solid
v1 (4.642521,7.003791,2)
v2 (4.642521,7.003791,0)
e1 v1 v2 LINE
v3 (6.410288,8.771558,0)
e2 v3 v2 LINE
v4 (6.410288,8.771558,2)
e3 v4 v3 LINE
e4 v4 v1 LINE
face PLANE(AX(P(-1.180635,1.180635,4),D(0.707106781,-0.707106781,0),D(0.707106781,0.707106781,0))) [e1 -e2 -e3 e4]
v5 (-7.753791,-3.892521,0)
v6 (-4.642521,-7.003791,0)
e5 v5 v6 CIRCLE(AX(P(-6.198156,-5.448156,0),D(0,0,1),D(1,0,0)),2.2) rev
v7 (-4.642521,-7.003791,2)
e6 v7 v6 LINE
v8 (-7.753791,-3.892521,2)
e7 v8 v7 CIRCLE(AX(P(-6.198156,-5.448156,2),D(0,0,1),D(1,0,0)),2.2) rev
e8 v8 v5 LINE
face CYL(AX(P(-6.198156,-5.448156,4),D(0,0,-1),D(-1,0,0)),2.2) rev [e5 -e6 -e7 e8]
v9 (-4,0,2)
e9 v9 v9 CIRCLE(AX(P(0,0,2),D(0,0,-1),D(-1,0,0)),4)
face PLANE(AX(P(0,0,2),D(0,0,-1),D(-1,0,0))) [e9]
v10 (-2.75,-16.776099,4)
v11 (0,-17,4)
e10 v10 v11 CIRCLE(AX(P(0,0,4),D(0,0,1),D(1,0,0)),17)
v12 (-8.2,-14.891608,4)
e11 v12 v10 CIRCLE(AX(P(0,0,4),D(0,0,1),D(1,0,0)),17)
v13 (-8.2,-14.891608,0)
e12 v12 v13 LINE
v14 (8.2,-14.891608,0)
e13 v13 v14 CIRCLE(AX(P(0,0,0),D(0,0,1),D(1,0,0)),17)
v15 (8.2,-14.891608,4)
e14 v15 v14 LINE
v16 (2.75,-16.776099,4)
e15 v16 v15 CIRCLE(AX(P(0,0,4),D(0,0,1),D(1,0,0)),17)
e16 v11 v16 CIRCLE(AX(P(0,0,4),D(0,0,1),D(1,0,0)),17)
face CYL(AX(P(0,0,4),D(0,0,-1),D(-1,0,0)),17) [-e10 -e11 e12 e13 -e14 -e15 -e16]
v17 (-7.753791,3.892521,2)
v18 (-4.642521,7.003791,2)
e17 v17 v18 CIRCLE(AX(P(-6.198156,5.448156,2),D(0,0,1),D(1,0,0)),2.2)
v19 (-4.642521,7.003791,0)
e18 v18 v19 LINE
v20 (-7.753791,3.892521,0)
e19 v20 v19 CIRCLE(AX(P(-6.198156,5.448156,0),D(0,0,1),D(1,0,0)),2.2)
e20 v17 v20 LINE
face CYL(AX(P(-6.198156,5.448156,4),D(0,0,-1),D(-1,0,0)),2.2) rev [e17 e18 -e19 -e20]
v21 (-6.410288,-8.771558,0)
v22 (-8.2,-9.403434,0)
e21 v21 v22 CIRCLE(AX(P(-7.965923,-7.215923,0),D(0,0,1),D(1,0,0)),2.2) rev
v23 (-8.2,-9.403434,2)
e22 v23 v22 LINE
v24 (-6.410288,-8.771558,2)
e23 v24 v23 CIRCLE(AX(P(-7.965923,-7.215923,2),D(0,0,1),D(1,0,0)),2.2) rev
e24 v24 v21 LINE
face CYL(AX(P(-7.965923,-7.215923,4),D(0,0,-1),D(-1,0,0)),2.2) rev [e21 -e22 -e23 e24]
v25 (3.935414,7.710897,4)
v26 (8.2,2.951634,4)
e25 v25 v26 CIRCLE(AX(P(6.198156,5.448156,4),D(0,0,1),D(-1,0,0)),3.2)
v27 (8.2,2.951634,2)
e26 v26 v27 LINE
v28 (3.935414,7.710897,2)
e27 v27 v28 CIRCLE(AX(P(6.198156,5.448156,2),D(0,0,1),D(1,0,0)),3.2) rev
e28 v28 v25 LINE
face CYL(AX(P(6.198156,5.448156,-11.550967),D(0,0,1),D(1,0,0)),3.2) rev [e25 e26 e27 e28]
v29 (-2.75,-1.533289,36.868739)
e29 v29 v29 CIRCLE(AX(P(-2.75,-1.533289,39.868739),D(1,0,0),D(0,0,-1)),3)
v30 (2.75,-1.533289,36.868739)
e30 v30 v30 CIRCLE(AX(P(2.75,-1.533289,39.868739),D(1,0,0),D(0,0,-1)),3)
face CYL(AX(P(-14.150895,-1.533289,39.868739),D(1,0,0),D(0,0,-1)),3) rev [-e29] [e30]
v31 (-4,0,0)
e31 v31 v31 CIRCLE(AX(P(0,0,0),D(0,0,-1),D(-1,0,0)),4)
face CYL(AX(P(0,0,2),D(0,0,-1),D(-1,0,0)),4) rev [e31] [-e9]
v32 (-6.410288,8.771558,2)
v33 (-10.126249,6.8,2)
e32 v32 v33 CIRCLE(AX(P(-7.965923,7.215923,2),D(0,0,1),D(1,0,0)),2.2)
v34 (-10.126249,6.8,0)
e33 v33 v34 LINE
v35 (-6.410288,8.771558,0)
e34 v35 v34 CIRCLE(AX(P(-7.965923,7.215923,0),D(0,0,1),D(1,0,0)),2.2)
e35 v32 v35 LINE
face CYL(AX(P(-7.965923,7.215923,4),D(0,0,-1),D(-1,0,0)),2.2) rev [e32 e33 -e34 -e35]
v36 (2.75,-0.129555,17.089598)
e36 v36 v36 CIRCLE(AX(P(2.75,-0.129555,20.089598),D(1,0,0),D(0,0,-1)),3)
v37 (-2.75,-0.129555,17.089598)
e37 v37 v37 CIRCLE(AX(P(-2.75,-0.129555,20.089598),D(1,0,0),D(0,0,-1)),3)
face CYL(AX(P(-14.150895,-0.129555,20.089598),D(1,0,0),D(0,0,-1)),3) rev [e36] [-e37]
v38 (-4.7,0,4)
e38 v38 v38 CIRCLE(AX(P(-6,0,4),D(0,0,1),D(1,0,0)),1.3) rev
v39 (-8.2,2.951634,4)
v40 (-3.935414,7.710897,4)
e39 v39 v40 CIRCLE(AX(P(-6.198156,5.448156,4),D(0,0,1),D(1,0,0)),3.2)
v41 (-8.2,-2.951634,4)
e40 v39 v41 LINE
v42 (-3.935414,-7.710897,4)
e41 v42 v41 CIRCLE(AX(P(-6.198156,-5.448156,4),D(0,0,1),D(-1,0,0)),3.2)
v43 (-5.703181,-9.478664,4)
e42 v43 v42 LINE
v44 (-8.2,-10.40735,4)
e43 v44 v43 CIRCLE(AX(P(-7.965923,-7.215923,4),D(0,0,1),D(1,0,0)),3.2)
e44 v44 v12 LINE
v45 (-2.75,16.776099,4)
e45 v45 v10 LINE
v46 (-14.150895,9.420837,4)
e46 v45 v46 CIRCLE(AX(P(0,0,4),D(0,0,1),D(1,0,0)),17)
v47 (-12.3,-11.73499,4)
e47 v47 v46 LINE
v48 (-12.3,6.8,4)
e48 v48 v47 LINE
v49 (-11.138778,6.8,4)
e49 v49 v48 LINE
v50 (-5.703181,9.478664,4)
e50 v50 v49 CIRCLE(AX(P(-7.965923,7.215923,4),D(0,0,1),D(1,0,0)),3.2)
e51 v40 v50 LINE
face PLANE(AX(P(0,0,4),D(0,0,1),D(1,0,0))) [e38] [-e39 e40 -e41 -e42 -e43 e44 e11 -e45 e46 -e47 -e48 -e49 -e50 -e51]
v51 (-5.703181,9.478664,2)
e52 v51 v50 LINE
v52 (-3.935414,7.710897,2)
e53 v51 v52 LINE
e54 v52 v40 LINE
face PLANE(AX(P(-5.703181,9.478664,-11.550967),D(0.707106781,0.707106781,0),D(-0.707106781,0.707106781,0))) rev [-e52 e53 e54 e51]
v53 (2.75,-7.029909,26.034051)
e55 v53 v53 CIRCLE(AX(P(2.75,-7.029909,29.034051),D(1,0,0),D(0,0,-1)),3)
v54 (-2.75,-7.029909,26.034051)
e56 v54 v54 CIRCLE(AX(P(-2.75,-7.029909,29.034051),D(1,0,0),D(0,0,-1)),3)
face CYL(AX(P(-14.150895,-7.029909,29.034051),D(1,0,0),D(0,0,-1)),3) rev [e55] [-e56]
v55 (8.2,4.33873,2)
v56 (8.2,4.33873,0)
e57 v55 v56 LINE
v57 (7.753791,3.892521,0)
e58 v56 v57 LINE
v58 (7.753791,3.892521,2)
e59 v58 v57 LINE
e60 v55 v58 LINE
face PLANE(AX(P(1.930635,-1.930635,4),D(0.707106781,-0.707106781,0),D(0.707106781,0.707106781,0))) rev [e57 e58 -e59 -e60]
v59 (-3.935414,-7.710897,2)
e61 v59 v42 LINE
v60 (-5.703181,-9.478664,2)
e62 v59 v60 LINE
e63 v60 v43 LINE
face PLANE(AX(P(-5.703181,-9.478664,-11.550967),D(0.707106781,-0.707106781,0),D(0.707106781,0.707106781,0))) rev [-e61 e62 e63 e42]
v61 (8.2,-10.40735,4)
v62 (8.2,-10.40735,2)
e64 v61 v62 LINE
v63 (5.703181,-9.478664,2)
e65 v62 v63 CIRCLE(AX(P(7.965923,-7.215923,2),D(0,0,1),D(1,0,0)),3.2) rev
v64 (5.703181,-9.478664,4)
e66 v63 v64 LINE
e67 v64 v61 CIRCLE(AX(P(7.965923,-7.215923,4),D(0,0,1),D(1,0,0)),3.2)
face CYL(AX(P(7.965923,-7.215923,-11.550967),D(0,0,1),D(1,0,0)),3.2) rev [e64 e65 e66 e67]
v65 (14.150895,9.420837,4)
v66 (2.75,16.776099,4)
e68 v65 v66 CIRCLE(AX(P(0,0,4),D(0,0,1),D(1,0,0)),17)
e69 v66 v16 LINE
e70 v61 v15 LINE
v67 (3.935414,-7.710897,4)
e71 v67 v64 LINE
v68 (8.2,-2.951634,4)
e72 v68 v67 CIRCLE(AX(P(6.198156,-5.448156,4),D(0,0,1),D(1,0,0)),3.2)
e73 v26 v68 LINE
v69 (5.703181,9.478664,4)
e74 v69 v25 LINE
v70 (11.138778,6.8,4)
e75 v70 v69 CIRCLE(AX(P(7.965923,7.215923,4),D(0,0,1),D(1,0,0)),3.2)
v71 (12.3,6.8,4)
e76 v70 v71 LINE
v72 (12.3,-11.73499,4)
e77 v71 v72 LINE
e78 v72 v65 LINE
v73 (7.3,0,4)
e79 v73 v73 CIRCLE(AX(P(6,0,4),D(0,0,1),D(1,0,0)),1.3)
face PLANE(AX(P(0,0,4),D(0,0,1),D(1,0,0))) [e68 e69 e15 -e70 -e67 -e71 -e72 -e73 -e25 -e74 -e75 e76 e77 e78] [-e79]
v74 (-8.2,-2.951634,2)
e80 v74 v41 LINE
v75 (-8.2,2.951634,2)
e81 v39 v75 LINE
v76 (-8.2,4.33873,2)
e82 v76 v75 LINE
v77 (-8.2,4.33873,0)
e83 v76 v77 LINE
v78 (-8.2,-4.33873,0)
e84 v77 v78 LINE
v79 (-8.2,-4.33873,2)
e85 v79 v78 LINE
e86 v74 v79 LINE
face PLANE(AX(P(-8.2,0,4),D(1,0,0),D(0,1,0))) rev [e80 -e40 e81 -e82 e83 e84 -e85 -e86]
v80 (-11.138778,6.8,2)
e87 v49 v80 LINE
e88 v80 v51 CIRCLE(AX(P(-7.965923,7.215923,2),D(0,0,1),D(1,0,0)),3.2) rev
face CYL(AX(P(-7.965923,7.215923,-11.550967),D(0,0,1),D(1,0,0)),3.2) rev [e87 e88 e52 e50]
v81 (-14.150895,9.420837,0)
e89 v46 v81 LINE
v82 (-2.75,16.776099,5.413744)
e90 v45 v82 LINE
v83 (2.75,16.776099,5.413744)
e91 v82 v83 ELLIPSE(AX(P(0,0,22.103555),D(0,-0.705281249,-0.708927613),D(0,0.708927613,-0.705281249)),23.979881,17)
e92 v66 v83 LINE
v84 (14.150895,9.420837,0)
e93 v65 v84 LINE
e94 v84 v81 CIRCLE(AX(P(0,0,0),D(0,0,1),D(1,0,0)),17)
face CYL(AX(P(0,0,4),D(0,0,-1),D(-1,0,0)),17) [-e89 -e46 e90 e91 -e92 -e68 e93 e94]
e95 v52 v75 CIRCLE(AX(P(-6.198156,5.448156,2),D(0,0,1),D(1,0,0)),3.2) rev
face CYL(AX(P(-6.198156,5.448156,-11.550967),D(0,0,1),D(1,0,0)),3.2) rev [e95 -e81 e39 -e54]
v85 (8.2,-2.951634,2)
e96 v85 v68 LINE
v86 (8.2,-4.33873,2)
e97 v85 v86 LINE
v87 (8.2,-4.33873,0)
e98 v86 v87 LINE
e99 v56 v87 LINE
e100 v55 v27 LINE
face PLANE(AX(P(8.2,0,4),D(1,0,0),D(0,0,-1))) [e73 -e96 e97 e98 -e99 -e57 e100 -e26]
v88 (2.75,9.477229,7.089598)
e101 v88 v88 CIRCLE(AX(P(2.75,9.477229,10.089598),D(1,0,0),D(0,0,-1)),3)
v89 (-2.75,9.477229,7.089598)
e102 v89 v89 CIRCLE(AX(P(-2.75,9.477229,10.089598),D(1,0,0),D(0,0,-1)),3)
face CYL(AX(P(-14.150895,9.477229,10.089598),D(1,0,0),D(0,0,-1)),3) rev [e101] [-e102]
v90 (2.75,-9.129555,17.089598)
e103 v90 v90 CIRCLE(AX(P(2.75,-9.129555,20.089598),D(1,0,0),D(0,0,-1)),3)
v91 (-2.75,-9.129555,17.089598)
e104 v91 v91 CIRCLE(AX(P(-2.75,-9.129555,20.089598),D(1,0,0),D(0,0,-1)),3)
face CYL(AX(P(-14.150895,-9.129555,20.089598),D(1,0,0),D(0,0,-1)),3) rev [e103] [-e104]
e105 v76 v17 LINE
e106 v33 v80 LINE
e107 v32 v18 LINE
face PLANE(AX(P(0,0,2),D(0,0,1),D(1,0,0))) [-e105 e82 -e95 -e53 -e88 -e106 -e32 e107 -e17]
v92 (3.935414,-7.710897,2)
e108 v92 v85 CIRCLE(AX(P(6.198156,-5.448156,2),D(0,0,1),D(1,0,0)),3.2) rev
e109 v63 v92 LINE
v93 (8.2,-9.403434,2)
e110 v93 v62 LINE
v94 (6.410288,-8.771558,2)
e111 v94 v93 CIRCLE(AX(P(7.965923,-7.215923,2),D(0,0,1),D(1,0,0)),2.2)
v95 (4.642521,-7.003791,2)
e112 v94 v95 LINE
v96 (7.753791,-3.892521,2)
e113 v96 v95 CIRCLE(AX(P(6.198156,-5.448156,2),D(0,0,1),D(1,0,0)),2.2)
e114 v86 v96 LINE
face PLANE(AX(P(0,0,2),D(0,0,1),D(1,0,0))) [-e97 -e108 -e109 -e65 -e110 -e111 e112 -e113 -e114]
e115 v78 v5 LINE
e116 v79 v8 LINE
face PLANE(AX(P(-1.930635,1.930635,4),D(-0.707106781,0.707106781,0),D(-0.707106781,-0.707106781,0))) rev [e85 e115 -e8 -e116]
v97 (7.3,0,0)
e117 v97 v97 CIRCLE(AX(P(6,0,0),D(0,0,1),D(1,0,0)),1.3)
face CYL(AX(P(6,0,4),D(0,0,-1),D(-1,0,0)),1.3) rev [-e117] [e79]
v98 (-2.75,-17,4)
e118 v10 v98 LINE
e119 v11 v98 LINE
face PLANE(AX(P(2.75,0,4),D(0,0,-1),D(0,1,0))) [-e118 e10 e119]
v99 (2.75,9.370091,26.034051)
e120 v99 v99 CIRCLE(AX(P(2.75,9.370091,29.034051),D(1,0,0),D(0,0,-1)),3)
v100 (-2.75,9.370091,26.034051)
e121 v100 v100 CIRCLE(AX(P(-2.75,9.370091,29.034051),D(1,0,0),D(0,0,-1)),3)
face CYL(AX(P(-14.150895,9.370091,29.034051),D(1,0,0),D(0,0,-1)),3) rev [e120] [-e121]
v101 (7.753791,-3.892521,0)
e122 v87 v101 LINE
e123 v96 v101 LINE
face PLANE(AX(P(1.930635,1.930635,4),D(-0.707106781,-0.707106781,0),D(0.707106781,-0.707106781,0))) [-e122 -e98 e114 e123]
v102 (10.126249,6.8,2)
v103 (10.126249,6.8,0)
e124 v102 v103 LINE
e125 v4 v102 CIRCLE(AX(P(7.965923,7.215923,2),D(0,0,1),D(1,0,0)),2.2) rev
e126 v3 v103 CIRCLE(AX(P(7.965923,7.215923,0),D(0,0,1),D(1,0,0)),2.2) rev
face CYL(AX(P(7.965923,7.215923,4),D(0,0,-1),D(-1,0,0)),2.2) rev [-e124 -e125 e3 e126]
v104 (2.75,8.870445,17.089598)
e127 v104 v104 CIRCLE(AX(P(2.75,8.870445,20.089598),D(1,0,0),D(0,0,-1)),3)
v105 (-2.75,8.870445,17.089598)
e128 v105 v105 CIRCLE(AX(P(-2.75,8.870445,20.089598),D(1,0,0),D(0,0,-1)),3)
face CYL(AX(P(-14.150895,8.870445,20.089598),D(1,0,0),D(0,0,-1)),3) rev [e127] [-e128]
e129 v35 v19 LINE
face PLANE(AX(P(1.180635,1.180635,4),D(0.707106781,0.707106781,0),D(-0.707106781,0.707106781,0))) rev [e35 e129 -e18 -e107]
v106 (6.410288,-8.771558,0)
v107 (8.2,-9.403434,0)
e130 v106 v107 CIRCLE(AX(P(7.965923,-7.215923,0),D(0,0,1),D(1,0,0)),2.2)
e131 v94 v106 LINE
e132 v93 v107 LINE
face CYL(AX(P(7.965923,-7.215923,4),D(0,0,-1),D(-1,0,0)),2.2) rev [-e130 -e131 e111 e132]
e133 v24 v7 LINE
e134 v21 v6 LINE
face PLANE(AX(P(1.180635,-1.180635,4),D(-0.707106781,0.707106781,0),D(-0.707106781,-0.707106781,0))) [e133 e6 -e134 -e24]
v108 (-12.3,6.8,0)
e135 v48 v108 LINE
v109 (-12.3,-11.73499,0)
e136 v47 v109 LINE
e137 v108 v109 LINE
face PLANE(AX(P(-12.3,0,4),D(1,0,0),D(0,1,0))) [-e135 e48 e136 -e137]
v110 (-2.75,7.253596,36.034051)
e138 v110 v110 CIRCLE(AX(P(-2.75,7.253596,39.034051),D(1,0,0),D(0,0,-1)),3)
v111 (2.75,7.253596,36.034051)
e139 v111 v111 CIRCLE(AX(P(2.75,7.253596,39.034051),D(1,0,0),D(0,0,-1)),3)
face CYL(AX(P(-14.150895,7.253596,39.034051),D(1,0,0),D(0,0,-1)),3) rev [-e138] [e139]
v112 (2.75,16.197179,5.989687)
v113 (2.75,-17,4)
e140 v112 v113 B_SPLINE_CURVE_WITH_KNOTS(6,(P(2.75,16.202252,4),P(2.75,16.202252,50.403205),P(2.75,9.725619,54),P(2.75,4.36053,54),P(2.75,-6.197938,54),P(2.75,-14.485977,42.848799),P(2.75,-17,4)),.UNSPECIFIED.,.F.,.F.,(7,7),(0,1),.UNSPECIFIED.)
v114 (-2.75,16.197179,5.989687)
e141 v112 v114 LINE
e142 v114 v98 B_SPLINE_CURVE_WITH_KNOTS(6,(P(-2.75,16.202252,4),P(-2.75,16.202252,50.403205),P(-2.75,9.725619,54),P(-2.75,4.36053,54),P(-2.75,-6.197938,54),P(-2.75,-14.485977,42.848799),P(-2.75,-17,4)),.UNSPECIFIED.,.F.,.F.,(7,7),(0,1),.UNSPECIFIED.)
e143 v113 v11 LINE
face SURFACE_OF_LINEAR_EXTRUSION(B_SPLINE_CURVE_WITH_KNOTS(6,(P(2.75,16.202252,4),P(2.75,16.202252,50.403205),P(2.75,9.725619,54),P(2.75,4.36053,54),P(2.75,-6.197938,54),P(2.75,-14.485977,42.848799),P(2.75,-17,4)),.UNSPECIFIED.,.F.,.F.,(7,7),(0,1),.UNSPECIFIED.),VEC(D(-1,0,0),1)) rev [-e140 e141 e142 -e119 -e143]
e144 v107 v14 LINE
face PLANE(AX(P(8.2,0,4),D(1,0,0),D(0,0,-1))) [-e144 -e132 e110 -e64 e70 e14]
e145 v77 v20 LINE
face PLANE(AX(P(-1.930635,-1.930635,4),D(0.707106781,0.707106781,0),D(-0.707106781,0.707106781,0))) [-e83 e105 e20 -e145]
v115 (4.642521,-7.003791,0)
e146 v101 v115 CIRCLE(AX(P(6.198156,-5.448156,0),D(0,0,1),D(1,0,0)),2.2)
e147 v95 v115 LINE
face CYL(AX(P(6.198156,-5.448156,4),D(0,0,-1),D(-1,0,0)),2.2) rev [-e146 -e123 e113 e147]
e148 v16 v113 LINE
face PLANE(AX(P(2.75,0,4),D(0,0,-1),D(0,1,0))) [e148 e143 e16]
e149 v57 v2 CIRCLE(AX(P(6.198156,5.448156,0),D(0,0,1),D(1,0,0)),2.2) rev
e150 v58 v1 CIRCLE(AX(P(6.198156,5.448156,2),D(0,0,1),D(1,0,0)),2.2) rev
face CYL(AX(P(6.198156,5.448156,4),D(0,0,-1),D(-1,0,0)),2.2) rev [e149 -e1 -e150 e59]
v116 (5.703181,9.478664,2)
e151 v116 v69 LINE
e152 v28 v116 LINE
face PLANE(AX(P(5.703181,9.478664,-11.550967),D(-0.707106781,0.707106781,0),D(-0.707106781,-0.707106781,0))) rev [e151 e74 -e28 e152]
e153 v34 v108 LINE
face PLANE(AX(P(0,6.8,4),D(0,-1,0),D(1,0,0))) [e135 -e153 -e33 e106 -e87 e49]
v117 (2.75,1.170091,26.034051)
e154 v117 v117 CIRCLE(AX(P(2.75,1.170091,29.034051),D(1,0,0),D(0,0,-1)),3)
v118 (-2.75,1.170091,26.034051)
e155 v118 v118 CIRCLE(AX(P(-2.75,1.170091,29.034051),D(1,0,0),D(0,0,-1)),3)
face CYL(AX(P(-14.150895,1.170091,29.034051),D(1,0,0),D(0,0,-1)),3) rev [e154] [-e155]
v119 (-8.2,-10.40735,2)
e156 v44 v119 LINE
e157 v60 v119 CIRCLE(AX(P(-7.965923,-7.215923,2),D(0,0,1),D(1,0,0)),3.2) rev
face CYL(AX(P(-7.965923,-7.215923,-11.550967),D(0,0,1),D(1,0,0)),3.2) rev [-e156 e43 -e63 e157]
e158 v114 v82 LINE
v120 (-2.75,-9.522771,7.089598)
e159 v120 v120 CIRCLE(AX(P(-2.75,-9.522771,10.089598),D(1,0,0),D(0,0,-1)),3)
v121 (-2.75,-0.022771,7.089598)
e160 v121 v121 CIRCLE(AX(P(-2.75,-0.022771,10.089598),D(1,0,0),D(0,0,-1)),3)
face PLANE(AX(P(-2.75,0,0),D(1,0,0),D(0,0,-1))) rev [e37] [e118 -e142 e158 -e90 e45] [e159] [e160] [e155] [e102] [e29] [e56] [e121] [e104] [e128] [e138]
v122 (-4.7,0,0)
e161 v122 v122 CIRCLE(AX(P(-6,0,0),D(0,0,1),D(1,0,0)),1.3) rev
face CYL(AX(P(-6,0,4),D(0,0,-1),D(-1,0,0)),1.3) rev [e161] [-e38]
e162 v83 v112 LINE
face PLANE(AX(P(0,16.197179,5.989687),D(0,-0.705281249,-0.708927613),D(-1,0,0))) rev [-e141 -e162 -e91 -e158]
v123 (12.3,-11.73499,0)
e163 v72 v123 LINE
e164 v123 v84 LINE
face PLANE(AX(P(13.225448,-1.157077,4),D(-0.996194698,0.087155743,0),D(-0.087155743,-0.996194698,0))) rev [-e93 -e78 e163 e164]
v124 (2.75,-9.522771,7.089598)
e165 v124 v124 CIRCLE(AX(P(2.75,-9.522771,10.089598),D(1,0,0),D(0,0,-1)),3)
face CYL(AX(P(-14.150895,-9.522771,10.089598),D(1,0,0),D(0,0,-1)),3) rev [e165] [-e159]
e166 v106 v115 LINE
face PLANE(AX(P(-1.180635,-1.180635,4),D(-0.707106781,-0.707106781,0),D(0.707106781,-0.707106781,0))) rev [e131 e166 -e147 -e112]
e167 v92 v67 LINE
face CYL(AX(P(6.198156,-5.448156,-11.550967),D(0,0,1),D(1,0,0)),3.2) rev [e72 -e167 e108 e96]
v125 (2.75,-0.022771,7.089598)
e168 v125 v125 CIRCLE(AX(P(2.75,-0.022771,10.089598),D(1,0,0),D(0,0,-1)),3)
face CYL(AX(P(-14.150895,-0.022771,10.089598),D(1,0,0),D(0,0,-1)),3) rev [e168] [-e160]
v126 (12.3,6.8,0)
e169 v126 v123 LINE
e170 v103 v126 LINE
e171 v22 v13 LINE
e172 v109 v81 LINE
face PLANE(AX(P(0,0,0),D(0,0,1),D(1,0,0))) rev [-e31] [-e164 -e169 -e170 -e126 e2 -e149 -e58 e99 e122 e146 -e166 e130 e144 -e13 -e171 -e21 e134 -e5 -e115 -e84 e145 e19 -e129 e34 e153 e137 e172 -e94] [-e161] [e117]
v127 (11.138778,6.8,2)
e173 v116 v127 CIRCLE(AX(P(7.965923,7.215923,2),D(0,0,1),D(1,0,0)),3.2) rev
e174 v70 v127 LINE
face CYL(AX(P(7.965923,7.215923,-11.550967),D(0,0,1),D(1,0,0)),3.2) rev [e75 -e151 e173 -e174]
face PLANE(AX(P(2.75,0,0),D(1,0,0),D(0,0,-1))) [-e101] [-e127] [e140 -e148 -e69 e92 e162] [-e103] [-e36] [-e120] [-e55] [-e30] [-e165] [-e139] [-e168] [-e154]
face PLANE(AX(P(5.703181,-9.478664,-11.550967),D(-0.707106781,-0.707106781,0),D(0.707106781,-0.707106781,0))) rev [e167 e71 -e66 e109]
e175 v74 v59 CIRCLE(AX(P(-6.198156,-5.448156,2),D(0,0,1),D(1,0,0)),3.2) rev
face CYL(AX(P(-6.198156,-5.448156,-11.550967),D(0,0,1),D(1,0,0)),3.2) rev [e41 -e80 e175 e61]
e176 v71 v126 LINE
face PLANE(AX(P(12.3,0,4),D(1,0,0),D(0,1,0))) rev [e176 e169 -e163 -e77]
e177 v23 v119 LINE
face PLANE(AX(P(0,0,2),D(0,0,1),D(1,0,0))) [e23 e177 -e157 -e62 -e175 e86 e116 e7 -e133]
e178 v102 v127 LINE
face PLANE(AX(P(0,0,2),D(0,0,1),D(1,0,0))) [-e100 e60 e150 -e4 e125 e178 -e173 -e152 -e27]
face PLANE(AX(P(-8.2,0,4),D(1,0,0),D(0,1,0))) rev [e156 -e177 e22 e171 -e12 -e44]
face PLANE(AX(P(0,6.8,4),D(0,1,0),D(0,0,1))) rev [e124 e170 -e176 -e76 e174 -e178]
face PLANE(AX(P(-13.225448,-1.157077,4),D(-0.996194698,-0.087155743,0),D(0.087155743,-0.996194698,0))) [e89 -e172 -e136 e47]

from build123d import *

# Parameters (mm, degrees)
SKETCH_2_R              = 1.3
EXTRUDE_1_DEPTH         = 4
CUT_EXTRUDE_1_DEPTH     = 2
EXTRUDE_START           = -2.75
EXTRUDE_2_DEPTH         = 5.5
CUT_EXTRUDE1_DEPTH      = 56.700937662
CUT_EXTRUDE1_DEPTH_BACK = 56.700937662
SKETCH_12_R             = 3
SKETCH1_R               = 4
CUT_EXTRUDE2_DEPTH      = 2


# Read off the part's stored shape, not the designer's step: 凸台-拉伸2
with BuildPart() as part:
    # 草图2 → 凸台-拉伸1 (new body)
    with BuildSketch(Plane.XY):
        with BuildLine():
            Line((-14.150895062, 9.420836955), (-12.3, -11.734990413))
            Line((-12.3, -11.734990413), (-12.3, 6.8))
            Line((-12.3, 6.8), (-10.126248664, 6.8))
            ThreePointArc((-10.126248664, 6.8), (-8.997025336, 9.159328805), (-6.410287771, 8.771557608))
            Line((-6.410287771, 8.771557608), (-4.642520818, 7.003790655))
            ThreePointArc((-4.642520818, 7.003790655), (-4.642520818, 3.892520818), (-7.753790655, 3.892520818))
            Line((-7.753790655, 3.892520818), (-8.2, 4.338730163))
            Line((-8.2, 4.338730163), (-8.2, -4.338730163))
            Line((-8.2, -4.338730163), (-7.753790655, -3.892520818))
            ThreePointArc((-7.753790655, -3.892520818), (-4.642520818, -3.892520818), (-4.642520818, -7.003790655))
            Line((-4.642520818, -7.003790655), (-6.410287771, -8.771557608))
            ThreePointArc((-6.410287771, -8.771557608), (-7.233498139, -9.29042366), (-8.2, -9.403434475))
            Line((-8.2, -9.403434475), (-8.2, -14.891608375))
            ThreePointArc((-8.2, -14.891608375), (0, -17), (8.2, -14.891608375))
            Line((8.2, -14.891608375), (8.2, -9.403434475))
            ThreePointArc((8.2, -9.403434475), (7.233498139, -9.29042366), (6.410287771, -8.771557608))
            Line((6.410287771, -8.771557608), (4.642520818, -7.003790655))
            ThreePointArc((4.642520818, -7.003790655), (4.642520818, -3.892520818), (7.753790655, -3.892520818))
            Line((7.753790655, -3.892520818), (8.2, -4.338730163))
            Line((8.2, -4.338730163), (8.2, 4.338730163))
            Line((8.2, 4.338730163), (7.753790655, 3.892520818))
            ThreePointArc((7.753790655, 3.892520818), (4.642520818, 3.892520818), (4.642520818, 7.003790655))
            Line((4.642520818, 7.003790655), (6.410287771, 8.771557608))
            ThreePointArc((6.410287771, 8.771557608), (8.997025336, 9.159328805), (10.126248664, 6.8))
            Line((10.126248664, 6.8), (12.3, 6.8))
            Line((12.3, 6.8), (12.3, -11.734990413))
            Line((12.3, -11.734990413), (14.150895062, 9.420836955))
            ThreePointArc((14.150895062, 9.420836955), (0, 17), (-14.150895062, 9.420836955))
        make_face()
        with Locations((-6, 0)):
            Circle(SKETCH_2_R, mode=Mode.SUBTRACT)
        with Locations((6, 0)):
            Circle(SKETCH_2_R, mode=Mode.SUBTRACT)
    extrude(amount=EXTRUDE_1_DEPTH)

    # 草图10 → 切除-拉伸1 (cut)
    with BuildSketch(Plane.XY.offset(4)):
        with BuildLine():
            Line((-5.703180989, 9.478664389), (-3.935414036, 7.710897436))
            ThreePointArc((-3.935414036, 7.710897436), (-3.935414036, 3.185414036), (-8.460897436, 3.185414036))
            Line((-8.460897436, 3.185414036), (-10.228664389, 4.953180989))
            ThreePointArc((-10.228664389, 4.953180989), (-10.228664389, 9.478664389), (-5.703180989, 9.478664389))
        make_face()
        with BuildLine():
            Line((-5.703180989, -9.478664389), (-3.935414036, -7.710897436))
            ThreePointArc((-3.935414036, -7.710897436), (-3.935414036, -3.185414036), (-8.460897436, -3.185414036))
            Line((-8.460897436, -3.185414036), (-10.228664389, -4.953180989))
            ThreePointArc((-10.228664389, -4.953180989), (-10.228664389, -9.478664389), (-5.703180989, -9.478664389))
        make_face()
        with BuildLine():
            Line((5.703180989, 9.478664389), (3.935414036, 7.710897436))
            ThreePointArc((3.935414036, 7.710897436), (3.935414036, 3.185414036), (8.460897436, 3.185414036))
            Line((8.460897436, 3.185414036), (10.228664389, 4.953180989))
            ThreePointArc((10.228664389, 4.953180989), (10.228664389, 9.478664389), (5.703180989, 9.478664389))
        make_face()
        with BuildLine():
            Line((5.703180989, -9.478664389), (3.935414036, -7.710897436))
            ThreePointArc((3.935414036, -7.710897436), (3.935414036, -3.185414036), (8.460897436, -3.185414036))
            Line((8.460897436, -3.185414036), (10.228664389, -4.953180989))
            ThreePointArc((10.228664389, -4.953180989), (10.228664389, -9.478664389), (5.703180989, -9.478664389))
        make_face()
    extrude(amount=-CUT_EXTRUDE_1_DEPTH, mode=Mode.SUBTRACT)

    # 凸台-拉伸2 outline → 凸台-拉伸2 (add)
    with BuildSketch(Plane(origin=(0, 0, 0), x_dir=(0, 0, -1), z_dir=(1, 0, 0)).offset(EXTRUDE_START)):
        with BuildLine():
            Line((-4, -17), (-4, 16.202251592))
            add(Edge.make_bspline(
                [(-4, 16.202251592), (-50.403204907, 16.202251592), (-54, 9.725618943), (-54, 4.360529693), (-54, -6.197938172), (-42.848798898, -14.485976771), (-4, -17)],
                knots=[0, 0, 0, 0, 0, 0, 0, 1, 1, 1, 1, 1, 1, 1], degree=6))
        make_face()
    extrude(amount=EXTRUDE_2_DEPTH)

    # 草图12 → Cut-Extrude1 (cut, two sides: drawn at the far end of the back side and taken through both)
    with BuildSketch(Plane(origin=(0, 0, 0), x_dir=(0, 0, -1), z_dir=(1, 0, 0)).offset(-CUT_EXTRUDE1_DEPTH_BACK)):
        with Locations((-10.089597621, 9.477228666)):
            Circle(SKETCH_12_R)
        with Locations((-10.089597621, -0.022771334)):
            Circle(SKETCH_12_R)
        with Locations((-10.089597621, -9.522771334)):
            Circle(SKETCH_12_R)
        with Locations((-20.089597621, 8.870444711)):
            Circle(SKETCH_12_R)
        with Locations((-20.089597621, -0.129555289)):
            Circle(SKETCH_12_R)
        with Locations((-20.089597621, -9.129555289)):
            Circle(SKETCH_12_R)
        with Locations((-29.034050933, 9.370090845)):
            Circle(SKETCH_12_R)
        with Locations((-29.034050933, 1.170090845)):
            Circle(SKETCH_12_R)
        with Locations((-29.034050933, -7.029909155)):
            Circle(SKETCH_12_R)
        with Locations((-39.034050933, 7.253595653)):
            Circle(SKETCH_12_R)
        with Locations((-39.868738586, -1.533288714)):
            Circle(SKETCH_12_R)
    extrude(amount=CUT_EXTRUDE1_DEPTH + CUT_EXTRUDE1_DEPTH_BACK, mode=Mode.SUBTRACT)

    # Chamfer1
    # the kernel refuses this chamfer: 2 mm, written as the material it adds along each edge
    with BuildSketch(Plane(origin=(-2.75, 16.202251592, 4), x_dir=(0, 0.9996220479086322, -0.02749111374520749), z_dir=(1, 0, 0))) as chamfer1_piece_1_section:
        with BuildLine():
            Line((2.052390471, 0), (-0.118013525, 2.043637132))
            Line((-0.118013525, 2.043637132), (-0.157992204, 2.042331311))
            ThreePointArc((-0.157992204, 2.042331311), (-0.069435245, 1.021504542), (-0.039984882, -0.001099645))
            Line((-0.039984882, -0.001099645), (0.001099645, -0.039984882))
            ThreePointArc((0.001099645, -0.039984882), (1.026519321, -0.011784294), (2.053490116, -0.039984882))
            Line((2.053490116, -0.039984882), (2.052390471, 0))
        make_face()
    chamfer1_piece_1 = extrude(amount=5.5, mode=Mode.PRIVATE)
    chamfer1_piece_1 = chamfer1_piece_1 & Plane(origin=(0, 0, 4.838799384), x_dir=(0.8324055918974517, 0.5541668797193253, 0), z_dir=(0, 0, -1)) * Cylinder(17, 20, mode=Mode.PRIVATE)
    add(chamfer1_piece_1)

    # Sketch1 → Cut-Extrude2 (cut)
    with BuildSketch(Plane(origin=(0, 0, 0), x_dir=(-1, 0, 0), z_dir=(0, 0, -1))):
        Circle(SKETCH1_R)
    extrude(amount=-CUT_EXTRUDE2_DEPTH, mode=Mode.SUBTRACT)


solid = part.part
